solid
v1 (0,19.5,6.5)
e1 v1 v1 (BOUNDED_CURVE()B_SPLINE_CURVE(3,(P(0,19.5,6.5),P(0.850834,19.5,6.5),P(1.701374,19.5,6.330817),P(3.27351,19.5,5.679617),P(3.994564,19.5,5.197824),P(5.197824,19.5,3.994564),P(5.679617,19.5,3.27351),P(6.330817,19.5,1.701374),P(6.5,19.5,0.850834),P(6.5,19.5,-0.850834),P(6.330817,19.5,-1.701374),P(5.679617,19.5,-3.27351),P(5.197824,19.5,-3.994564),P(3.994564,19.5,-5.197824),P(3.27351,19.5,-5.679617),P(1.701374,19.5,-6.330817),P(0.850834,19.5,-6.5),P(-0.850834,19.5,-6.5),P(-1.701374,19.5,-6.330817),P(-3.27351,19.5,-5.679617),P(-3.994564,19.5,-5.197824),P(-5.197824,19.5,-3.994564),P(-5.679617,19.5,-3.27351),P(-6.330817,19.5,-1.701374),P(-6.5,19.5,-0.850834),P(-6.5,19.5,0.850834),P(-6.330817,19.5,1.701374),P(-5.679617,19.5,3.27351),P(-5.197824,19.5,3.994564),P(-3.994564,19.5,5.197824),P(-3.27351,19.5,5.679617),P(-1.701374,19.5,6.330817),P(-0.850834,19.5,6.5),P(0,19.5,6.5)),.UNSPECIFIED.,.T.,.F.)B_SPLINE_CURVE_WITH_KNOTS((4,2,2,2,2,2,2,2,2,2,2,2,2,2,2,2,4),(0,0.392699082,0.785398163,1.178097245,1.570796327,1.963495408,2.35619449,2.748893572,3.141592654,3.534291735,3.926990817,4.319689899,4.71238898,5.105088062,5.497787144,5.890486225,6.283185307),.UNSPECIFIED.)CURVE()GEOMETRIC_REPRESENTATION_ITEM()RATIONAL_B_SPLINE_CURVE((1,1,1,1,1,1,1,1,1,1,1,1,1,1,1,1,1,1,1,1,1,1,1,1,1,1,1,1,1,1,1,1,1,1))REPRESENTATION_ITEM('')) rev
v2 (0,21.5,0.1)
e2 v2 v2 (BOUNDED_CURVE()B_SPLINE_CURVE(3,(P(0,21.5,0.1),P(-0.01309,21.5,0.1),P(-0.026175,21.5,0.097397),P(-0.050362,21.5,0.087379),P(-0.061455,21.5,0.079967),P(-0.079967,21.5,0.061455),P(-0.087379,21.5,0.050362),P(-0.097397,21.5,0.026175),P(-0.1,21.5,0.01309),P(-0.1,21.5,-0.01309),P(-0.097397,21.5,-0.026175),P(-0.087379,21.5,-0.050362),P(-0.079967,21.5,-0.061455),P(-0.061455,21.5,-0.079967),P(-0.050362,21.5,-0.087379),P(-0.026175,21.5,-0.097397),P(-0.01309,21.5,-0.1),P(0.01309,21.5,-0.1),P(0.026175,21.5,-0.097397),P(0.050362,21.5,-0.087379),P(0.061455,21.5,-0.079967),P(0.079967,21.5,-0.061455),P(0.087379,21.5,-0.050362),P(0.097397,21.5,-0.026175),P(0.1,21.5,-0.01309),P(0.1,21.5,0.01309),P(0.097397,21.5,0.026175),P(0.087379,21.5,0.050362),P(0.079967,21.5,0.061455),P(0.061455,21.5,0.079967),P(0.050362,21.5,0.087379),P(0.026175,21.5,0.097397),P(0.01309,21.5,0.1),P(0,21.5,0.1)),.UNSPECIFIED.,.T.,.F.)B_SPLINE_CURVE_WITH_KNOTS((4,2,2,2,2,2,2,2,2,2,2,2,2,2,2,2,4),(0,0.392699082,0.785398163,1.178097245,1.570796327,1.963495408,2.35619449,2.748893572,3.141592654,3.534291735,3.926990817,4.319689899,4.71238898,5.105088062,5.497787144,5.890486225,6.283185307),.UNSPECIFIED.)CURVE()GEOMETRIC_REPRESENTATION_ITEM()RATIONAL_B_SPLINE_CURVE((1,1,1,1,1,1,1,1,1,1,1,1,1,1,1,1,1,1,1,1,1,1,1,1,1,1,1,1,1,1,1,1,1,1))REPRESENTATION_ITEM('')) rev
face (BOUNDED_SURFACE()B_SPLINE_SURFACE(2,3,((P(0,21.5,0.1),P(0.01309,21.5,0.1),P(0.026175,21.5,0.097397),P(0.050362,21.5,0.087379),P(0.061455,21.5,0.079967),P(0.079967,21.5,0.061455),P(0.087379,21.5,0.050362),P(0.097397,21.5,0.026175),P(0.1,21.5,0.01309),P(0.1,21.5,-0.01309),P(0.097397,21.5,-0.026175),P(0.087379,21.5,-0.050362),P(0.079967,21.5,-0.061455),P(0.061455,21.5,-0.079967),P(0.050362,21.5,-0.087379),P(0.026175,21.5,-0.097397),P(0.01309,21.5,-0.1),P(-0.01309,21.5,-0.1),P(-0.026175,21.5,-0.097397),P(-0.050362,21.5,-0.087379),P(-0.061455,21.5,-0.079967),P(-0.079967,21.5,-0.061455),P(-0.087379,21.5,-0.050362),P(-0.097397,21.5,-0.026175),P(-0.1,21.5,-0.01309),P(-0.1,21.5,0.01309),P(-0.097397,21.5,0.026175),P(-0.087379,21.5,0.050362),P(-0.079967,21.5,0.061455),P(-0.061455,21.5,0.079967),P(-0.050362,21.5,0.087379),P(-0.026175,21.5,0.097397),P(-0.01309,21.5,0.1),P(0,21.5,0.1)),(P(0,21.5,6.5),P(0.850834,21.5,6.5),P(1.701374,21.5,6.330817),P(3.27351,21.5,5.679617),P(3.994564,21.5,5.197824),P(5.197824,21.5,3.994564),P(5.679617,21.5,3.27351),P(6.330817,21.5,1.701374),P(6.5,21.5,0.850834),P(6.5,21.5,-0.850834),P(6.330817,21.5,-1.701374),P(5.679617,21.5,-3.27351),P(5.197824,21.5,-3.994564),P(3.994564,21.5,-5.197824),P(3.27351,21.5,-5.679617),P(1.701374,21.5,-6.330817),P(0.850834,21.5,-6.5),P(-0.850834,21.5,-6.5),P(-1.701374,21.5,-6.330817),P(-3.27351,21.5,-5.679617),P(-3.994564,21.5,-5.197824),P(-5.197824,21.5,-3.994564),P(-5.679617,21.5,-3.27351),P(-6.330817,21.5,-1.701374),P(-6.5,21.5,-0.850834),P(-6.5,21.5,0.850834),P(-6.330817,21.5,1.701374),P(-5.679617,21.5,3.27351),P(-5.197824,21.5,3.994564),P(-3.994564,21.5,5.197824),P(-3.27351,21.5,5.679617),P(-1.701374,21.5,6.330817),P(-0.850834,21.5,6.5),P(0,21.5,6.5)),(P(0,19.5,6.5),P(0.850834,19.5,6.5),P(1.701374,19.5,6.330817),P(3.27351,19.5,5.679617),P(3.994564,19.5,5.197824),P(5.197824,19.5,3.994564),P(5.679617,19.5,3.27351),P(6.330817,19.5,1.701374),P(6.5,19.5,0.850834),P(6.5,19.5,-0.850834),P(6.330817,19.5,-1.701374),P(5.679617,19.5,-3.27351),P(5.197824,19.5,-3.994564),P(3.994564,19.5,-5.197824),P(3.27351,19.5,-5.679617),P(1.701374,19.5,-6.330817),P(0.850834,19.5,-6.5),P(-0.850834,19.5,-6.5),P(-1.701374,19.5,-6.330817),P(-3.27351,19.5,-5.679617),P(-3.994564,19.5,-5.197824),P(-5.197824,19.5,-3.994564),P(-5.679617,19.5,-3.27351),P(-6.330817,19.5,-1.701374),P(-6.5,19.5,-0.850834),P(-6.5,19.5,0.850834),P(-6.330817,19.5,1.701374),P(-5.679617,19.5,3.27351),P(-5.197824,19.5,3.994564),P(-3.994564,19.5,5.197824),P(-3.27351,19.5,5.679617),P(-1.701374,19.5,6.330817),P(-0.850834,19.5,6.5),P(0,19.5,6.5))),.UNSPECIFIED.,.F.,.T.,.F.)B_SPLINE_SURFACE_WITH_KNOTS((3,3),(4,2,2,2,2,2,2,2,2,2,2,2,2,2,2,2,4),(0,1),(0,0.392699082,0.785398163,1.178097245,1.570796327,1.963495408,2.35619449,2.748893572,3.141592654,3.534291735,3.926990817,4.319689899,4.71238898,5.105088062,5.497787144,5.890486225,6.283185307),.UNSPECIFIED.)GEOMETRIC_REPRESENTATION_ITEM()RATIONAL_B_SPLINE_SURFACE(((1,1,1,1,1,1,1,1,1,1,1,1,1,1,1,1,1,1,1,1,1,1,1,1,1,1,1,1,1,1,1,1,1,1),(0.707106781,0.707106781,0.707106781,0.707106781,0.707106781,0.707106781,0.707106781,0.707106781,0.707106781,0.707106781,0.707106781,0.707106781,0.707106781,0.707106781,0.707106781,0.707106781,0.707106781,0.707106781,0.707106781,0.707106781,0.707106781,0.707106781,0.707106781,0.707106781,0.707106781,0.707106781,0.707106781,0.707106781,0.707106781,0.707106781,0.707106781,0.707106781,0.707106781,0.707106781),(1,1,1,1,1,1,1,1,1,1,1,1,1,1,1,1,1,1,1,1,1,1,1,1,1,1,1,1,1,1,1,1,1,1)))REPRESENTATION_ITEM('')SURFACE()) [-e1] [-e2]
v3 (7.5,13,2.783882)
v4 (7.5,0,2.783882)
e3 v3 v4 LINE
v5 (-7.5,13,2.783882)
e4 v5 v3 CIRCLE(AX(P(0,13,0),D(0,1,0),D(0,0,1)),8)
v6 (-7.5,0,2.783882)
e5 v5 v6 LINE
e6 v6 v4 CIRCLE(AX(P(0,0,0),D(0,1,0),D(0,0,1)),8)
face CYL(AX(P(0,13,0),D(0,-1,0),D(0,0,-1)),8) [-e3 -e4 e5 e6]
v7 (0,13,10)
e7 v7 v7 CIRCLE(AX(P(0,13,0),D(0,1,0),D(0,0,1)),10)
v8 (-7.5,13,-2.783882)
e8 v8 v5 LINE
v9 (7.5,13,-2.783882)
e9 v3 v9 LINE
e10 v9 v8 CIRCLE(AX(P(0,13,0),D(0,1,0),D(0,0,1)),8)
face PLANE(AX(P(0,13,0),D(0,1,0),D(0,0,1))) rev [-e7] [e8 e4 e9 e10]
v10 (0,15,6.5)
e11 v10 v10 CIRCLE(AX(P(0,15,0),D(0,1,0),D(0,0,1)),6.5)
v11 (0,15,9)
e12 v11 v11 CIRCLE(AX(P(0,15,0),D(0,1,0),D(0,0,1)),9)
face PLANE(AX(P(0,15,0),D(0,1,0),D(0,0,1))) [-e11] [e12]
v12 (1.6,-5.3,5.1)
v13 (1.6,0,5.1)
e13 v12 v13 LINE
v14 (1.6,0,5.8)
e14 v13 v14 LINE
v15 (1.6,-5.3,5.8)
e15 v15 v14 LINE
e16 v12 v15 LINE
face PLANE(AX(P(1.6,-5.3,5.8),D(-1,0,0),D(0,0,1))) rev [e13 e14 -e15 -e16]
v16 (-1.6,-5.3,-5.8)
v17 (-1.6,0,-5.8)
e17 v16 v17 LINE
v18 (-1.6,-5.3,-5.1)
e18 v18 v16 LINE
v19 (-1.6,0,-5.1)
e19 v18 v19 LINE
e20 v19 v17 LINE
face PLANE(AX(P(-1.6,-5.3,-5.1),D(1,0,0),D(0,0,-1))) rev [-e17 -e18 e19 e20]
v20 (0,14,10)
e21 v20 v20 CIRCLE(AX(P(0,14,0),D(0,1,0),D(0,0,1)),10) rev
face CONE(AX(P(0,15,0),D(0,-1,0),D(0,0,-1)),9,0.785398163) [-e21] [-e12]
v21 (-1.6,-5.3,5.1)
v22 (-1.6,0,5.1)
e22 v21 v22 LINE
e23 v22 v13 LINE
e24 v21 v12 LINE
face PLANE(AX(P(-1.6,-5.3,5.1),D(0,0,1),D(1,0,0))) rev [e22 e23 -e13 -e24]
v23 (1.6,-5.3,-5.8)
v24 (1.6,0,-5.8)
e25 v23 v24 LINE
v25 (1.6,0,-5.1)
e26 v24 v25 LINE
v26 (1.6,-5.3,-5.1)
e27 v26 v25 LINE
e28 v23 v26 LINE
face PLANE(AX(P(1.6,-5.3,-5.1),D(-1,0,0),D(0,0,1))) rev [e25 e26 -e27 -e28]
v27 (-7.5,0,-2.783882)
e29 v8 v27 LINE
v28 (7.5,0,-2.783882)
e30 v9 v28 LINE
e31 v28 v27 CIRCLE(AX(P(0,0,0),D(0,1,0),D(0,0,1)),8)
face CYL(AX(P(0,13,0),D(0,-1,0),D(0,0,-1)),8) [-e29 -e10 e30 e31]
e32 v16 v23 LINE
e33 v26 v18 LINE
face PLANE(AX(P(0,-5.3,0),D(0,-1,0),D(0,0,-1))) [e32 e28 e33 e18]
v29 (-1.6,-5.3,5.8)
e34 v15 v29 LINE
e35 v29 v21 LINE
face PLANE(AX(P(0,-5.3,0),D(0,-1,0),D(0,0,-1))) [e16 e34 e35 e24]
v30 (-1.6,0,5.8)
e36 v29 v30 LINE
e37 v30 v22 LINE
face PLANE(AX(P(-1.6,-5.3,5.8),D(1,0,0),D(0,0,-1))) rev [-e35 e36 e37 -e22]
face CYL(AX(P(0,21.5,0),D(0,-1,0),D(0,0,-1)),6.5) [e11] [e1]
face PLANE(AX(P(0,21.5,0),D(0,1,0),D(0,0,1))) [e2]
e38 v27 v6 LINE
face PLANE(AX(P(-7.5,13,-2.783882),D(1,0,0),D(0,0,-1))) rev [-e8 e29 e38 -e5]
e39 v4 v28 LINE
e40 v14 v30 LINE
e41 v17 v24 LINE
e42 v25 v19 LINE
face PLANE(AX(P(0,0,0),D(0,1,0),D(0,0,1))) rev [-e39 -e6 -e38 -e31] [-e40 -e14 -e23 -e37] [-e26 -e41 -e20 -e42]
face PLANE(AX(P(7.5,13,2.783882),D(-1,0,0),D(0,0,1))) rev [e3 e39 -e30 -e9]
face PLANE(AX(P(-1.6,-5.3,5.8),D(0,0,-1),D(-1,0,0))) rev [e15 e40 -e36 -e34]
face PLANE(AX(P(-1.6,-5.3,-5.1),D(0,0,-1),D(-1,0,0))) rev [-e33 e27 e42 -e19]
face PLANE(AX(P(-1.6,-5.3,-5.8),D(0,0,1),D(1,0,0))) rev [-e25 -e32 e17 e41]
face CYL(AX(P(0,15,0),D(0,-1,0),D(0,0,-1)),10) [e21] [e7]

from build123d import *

# Parameters (mm, degrees)
BOSS_EXTRUDE1_DEPTH = 13
SKETCH2_R           = 10
BOSS_EXTRUDE2_DEPTH = 2
CHAMFER1_SIZE       = 1
SKETCH3_R           = 6.5
BOSS_EXTRUDE3_DEPTH = 6.5
FILLET1_SIZE        = 2
FILLET1_SIZE_2      = 6.4
SKETCH4_W           = 3.2
SKETCH4_H           = 0.7
BOSS_EXTRUDE4_DEPTH = 5.3


with BuildPart() as part:
    # Sketch1 → Boss-Extrude1 (new body)
    with BuildSketch(Plane(origin=(0, 0, 0), x_dir=(1, 0, 0), z_dir=(0, 1, 0))):
        with BuildLine():
            Line((-7.5, 2.783882181), (-7.5, -2.783882181))
            ThreePointArc((-7.5, -2.783882181), (0, -8), (7.5, -2.783882181))
            Line((7.5, -2.783882181), (7.5, 2.783882181))
            ThreePointArc((7.5, 2.783882181), (0, 8), (-7.5, 2.783882181))
        make_face()
    extrude(amount=BOSS_EXTRUDE1_DEPTH)

    # Sketch2 → Boss-Extrude2 (add)
    with BuildSketch(Plane(origin=(0, 13, 0), x_dir=(1, 0, 0), z_dir=(0, 1, 0))):
        with Locations(Location((0, 0, 0), (0, 0, 270))):
            Circle(SKETCH2_R)
    extrude(amount=BOSS_EXTRUDE2_DEPTH)

    # Chamfer1
    chamfer1_edges = [part.edges().sort_by_distance(p)[0] for p in [
        (0, 15, -10),
    ]]
    chamfer(chamfer1_edges, length=CHAMFER1_SIZE)

    # Sketch3 → Boss-Extrude3 (add)
    with BuildSketch(Plane(origin=(0, 15, 0), x_dir=(1, 0, 0), z_dir=(0, 1, 0))):
        with Locations(Location((0, 0, 0), (0, 0, 90))):
            Circle(SKETCH3_R)
    extrude(amount=BOSS_EXTRUDE3_DEPTH)

    # Fillet1
    # an asymmetric fillet: 6.4, 2 mm, written as the material it takes off along each edge
    with BuildSketch(Plane(origin=(0, 21.5, 0), x_dir=(0, 0, -1), z_dir=(1, 0, 0))) as fillet1_piece_1:
        with BuildLine():
            Bezier((6.5, -FILLET1_SIZE), (6.5, 0), (6.5 - FILLET1_SIZE_2, 0), weights=[1, 0.707106781, 1])
            Line((6.5 - FILLET1_SIZE_2, 0), (6.5, 0))
            Line((6.5, 0), (6.5, -FILLET1_SIZE))
        make_face()
    revolve(axis=Axis((0, 21.5, 0), (0, 1, 0)), mode=Mode.SUBTRACT)

    # Sketch4 → Boss-Extrude4 (add)
    with BuildSketch(Plane.XZ):
        with Locations((0, 5.45)):
            Rectangle(SKETCH4_W, SKETCH4_H)
        with Locations((0, -5.45)):
            Rectangle(SKETCH4_W, SKETCH4_H)
    extrude(amount=BOSS_EXTRUDE4_DEPTH)


solid = part.part
